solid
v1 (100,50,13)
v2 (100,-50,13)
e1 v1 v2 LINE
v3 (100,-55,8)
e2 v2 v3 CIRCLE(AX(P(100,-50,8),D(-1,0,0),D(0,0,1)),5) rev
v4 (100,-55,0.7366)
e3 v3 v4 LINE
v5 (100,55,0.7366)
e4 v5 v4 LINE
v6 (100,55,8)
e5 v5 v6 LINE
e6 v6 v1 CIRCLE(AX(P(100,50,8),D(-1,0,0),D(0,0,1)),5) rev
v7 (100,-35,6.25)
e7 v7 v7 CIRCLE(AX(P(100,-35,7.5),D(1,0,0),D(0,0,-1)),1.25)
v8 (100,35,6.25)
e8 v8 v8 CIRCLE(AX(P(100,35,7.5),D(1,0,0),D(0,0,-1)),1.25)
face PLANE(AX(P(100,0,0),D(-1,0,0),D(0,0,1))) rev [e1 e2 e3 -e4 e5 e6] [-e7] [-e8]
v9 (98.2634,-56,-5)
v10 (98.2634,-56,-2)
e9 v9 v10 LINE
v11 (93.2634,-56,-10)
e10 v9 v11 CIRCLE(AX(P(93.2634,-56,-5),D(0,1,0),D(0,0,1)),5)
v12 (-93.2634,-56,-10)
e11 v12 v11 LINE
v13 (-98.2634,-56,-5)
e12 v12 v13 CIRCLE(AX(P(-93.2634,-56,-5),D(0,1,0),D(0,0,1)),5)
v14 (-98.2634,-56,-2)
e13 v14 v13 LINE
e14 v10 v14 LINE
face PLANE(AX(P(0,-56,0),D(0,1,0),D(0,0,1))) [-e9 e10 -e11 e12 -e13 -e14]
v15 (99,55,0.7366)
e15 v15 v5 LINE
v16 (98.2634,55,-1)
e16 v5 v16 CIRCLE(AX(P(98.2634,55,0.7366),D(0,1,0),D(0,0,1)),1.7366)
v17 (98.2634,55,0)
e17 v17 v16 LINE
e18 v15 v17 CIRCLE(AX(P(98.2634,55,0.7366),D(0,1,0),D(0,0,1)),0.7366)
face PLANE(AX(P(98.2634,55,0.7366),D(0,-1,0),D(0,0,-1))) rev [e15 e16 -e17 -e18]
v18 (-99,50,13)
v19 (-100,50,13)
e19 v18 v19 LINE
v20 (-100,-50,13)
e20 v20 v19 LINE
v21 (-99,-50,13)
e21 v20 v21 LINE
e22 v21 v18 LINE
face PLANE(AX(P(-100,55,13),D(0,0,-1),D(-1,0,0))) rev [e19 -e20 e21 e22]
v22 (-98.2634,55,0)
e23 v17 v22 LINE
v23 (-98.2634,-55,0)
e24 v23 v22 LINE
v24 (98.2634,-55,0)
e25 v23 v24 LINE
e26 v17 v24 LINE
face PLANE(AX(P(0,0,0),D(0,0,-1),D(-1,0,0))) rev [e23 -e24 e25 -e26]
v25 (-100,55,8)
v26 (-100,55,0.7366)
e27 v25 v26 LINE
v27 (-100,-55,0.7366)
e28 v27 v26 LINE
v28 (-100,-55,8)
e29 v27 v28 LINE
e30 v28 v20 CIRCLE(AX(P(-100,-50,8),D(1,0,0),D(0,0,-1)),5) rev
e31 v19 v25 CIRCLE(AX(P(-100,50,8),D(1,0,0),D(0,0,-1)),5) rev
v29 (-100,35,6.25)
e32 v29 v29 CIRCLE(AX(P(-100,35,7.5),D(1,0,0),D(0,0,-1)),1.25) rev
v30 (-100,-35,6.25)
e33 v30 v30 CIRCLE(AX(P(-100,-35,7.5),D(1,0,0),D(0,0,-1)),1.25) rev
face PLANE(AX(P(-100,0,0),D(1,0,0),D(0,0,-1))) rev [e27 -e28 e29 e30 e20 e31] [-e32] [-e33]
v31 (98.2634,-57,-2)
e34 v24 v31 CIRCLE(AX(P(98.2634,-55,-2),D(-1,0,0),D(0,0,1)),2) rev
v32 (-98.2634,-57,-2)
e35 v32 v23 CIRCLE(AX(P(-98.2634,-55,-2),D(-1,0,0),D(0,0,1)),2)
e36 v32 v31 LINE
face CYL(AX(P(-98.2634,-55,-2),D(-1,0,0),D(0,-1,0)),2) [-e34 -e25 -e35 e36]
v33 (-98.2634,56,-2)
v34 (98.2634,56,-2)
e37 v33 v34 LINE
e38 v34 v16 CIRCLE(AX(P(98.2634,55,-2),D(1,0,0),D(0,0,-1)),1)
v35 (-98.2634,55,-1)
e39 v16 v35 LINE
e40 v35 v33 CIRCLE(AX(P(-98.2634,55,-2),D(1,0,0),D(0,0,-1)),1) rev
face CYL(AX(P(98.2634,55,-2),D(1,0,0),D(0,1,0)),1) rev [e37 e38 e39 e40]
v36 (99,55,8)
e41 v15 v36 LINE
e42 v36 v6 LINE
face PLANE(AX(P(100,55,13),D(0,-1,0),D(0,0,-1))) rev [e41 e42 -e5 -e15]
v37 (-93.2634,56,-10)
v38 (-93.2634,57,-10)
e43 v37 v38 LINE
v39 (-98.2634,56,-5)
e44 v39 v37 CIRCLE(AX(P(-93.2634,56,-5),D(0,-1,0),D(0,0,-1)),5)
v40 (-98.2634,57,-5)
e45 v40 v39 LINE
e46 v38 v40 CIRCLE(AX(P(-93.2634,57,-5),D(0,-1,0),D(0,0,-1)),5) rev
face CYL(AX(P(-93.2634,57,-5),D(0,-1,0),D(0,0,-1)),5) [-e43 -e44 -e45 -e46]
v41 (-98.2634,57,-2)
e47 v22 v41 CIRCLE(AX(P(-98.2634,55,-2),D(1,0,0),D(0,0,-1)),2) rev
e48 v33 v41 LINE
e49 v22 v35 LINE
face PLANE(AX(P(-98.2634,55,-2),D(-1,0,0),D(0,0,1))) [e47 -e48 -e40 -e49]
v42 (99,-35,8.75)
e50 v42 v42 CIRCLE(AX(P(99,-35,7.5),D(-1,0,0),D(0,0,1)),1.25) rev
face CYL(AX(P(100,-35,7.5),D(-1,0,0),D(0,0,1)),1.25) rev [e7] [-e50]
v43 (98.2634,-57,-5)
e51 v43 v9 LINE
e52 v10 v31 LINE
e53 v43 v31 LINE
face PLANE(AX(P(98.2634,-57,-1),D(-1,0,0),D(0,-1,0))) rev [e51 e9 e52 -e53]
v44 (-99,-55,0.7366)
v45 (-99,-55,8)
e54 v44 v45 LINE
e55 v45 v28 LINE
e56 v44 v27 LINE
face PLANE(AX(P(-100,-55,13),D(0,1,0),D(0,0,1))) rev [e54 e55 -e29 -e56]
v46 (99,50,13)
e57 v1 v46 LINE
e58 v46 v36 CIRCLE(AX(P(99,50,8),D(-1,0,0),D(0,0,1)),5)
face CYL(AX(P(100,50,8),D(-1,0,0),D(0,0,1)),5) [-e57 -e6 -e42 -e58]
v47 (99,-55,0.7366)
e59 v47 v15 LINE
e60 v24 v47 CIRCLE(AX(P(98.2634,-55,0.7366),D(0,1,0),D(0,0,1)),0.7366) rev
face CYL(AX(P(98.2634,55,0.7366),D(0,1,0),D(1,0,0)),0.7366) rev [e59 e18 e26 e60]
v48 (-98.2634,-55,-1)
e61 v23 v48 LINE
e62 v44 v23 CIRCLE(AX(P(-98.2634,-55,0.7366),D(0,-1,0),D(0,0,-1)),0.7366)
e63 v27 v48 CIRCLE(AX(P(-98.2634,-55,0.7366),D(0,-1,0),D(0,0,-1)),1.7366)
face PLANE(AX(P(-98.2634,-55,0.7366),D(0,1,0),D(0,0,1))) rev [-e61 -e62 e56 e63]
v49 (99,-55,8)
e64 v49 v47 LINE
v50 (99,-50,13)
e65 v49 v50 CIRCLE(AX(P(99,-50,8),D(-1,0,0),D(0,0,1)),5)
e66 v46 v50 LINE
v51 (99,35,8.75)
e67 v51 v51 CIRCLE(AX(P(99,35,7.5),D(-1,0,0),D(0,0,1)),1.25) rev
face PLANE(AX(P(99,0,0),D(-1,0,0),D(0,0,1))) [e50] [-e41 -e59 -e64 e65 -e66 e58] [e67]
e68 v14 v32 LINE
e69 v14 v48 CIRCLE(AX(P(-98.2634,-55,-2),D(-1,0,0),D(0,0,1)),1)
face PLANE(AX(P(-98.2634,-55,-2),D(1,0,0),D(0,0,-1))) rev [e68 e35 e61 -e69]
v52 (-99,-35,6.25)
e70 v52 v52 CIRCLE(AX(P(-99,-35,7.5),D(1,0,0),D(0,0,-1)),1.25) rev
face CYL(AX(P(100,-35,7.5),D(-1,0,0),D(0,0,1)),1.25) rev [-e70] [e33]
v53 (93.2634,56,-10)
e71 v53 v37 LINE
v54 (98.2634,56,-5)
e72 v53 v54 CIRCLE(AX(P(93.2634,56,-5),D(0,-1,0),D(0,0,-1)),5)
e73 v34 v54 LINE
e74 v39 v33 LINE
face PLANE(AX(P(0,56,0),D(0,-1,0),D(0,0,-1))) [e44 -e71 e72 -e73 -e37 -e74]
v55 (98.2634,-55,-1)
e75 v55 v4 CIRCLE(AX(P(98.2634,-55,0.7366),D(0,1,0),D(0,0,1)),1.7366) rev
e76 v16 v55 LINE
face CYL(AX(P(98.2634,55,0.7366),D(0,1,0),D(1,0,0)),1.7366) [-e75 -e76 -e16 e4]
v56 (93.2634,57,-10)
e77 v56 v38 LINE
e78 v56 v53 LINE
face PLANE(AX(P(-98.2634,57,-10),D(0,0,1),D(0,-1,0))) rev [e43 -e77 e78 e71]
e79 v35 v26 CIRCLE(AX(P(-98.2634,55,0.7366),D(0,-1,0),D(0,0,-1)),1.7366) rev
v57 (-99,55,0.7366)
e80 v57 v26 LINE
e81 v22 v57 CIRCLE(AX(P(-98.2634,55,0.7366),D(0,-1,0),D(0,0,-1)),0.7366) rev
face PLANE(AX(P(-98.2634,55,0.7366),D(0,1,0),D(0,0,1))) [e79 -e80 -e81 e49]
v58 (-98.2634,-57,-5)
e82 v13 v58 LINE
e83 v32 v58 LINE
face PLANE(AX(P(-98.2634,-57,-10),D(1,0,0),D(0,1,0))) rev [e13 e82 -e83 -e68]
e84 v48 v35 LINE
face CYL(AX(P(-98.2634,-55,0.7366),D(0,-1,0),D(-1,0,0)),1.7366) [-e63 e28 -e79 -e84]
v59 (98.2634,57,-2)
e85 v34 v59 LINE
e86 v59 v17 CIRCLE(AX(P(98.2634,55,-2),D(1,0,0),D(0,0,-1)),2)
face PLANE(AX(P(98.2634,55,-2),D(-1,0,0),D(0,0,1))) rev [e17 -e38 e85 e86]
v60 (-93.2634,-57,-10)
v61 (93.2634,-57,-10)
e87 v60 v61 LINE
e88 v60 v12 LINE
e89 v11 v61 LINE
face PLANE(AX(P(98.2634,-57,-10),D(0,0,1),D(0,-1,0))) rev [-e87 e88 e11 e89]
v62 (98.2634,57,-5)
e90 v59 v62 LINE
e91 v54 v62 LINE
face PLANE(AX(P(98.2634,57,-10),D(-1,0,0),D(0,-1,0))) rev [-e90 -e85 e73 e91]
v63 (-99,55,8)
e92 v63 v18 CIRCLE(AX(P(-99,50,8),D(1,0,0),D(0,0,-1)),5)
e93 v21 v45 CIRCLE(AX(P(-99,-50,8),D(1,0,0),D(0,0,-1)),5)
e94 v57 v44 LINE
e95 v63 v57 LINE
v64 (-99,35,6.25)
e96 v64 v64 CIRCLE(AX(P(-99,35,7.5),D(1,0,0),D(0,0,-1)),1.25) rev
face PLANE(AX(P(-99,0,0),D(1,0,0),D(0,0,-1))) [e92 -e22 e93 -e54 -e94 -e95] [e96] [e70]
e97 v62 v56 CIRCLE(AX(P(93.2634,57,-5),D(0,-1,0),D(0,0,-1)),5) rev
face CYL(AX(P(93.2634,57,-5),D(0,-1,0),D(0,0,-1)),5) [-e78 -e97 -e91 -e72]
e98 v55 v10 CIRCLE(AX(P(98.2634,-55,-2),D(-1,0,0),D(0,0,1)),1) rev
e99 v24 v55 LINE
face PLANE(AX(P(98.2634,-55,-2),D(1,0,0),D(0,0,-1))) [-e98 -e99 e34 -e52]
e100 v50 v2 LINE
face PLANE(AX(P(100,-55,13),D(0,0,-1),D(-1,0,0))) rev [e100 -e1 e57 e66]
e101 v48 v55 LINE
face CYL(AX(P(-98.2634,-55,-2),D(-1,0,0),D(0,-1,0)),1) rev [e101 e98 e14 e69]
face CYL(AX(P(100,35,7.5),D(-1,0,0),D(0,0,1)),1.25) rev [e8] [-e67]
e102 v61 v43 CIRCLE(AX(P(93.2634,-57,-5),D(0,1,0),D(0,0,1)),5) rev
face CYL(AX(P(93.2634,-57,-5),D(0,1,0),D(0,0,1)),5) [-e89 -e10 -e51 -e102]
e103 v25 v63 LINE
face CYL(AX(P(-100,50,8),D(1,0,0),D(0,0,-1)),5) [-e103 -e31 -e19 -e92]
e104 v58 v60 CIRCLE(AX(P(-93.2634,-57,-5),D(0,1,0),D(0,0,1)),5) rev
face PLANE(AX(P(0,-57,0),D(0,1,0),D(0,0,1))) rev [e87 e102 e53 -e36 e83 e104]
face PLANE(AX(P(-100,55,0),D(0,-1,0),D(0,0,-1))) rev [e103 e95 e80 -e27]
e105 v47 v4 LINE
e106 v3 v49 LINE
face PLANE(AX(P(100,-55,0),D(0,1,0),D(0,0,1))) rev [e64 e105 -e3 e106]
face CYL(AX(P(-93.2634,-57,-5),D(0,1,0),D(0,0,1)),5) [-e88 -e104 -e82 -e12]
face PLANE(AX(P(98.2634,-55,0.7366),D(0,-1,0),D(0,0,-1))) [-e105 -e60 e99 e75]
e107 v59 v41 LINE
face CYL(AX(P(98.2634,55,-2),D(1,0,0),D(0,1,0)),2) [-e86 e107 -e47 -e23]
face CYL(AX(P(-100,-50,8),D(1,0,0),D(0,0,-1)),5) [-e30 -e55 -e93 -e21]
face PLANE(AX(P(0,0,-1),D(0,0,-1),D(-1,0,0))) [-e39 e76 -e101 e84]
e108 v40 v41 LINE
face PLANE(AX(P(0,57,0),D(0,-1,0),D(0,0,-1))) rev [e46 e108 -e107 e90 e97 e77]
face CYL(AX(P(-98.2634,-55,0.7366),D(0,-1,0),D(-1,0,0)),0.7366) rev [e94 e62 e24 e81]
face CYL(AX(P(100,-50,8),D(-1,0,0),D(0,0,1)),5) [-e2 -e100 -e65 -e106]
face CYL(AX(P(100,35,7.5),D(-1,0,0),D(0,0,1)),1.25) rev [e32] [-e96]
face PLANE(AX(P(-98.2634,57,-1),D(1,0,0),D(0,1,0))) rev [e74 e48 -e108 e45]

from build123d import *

# Parameters (mm, degrees)
SKETCH1_W                    = 200
SKETCH1_H                    = 110
BASE_FLANGE1_DEPTH           = 1
EDGE_FLANGE1_STRIP_W         = 5.4732
EDGE_FLANGE1_STRIP_H         = 1
EDGE_FLANGE1_STRIP_CUT_DEPTH = 110
EDGE_FLANGE1_DEPTH           = 110
EDGE_FLANGE2_STRIP_W         = 5.4732
EDGE_FLANGE2_STRIP_H         = 1
EDGE_FLANGE2_STRIP_CUT_DEPTH = 110
EDGE_FLANGE2_DEPTH           = 110
CUT_EXTRUDE1_DEPTH           = 207.869524097
CUT_EXTRUDE1_DEPTH_BACK      = 10
SKETCH14_R                   = 1.25
EDGE_FLANGE3_DEPTH           = 196.5268
EDGE_FLANGE3_BEND_DEPTH      = 196.5268
FILLET1_R                    = 5


# Sheet-metal steps are written as plain solids
with BuildPart() as part:
    # Sketch1 → Base-Flange1 (new body)
    with BuildSketch(Plane.XY):
        Rectangle(SKETCH1_W, SKETCH1_H)
    extrude(amount=-BASE_FLANGE1_DEPTH)

    # Edge-Flange1 strip (across the edge) → Edge-Flange1 strip cut (cut)
    with BuildSketch(Plane(origin=(-100, 55, 0), x_dir=(1, 0, 0), z_dir=(0, -1, 0))):
        with Locations((-1, -0.5)):
            Rectangle(EDGE_FLANGE1_STRIP_W, EDGE_FLANGE1_STRIP_H)
    extrude(amount=EDGE_FLANGE1_STRIP_CUT_DEPTH, mode=Mode.SUBTRACT)

    # Edge-Flange1 section (across the edge) → Edge-Flange1 (add)
    with BuildSketch(Plane(origin=(-100, 55, 0), x_dir=(1, 0, 0), z_dir=(0, -1, 0))):
        with BuildLine():
            Line((0, 0.7366), (0, 13))
            Line((0, 13), (1, 13))
            Line((1, 13), (1, 0.7366))
            ThreePointArc((1, 0.7366), (1.215745145, 0.215745145), (1.7366, 0))
            Line((1.7366, 0), (1.7366, -1))
            ThreePointArc((1.7366, -1), (0.508638364, -0.491361636), (0, 0.7366))
        make_face()
    extrude(amount=EDGE_FLANGE1_DEPTH)

    # Edge-Flange2 strip (across the edge) → Edge-Flange2 strip cut (cut)
    with BuildSketch(Plane(origin=(100, -55, 0), x_dir=(-1, 0, 0), z_dir=(0, 1, 0))):
        with Locations((-1, -0.5)):
            Rectangle(EDGE_FLANGE2_STRIP_W, EDGE_FLANGE2_STRIP_H)
    extrude(amount=EDGE_FLANGE2_STRIP_CUT_DEPTH, mode=Mode.SUBTRACT)

    # Edge-Flange2 section (across the edge) → Edge-Flange2 (add)
    with BuildSketch(Plane(origin=(100, -55, 0), x_dir=(-1, 0, 0), z_dir=(0, 1, 0))):
        with BuildLine():
            Line((0, 0.7366), (0, 13))
            Line((0, 13), (1, 13))
            Line((1, 13), (1, 0.7366))
            ThreePointArc((1, 0.7366), (1.215745145, 0.215745145), (1.7366, 0))
            Line((1.7366, 0), (1.7366, -1))
            ThreePointArc((1.7366, -1), (0.508638364, -0.491361636), (0, 0.7366))
        make_face()
    extrude(amount=EDGE_FLANGE2_DEPTH)

    # Sketch14 → Cut-Extrude1 (cut, two sides: drawn at the far end of the back side and taken through both)
    with BuildSketch(Plane(origin=(-99, 0, 0), x_dir=(0, 0, -1), z_dir=(1, 0, 0)).offset(-CUT_EXTRUDE1_DEPTH_BACK)):
        with Locations(Location((-7.5, -35, 0), (0, 0, 180))):
            Circle(SKETCH14_R)
        with Locations(Location((-7.5, 35, 0), (0, 0, 180))):
            Circle(SKETCH14_R)
    extrude(amount=CUT_EXTRUDE1_DEPTH + CUT_EXTRUDE1_DEPTH_BACK, mode=Mode.SUBTRACT)

    # Edge-Flange3 section (across the edge) → Edge-Flange3 (add)
    with BuildSketch(Plane(origin=(98.2634, -56, -1), x_dir=(0, 1, 0), z_dir=(-1, 0, 0))):
        with BuildLine():
            Line((-1, 1), (-1, 9))
            Line((-1, 9), (0, 9))
            Line((0, 9), (0, 1))
            ThreePointArc((0, 1), (0.292893219, 0.292893219), (1, 0))
            Line((1, 0), (1, -1))
            ThreePointArc((1, -1), (-0.414213562, -0.414213562), (-1, 1))
        make_face()
    extrude(amount=EDGE_FLANGE3_DEPTH)

    # Edge-Flange3 section 2 (across the edge) → Edge-Flange3 bend (add)
    with BuildSketch(Plane(origin=(-98.2634, 56, -1), x_dir=(0, -1, 0), z_dir=(1, 0, 0))):
        with BuildLine():
            Line((-1, 1), (-1, 9))
            Line((-1, 9), (0, 9))
            Line((0, 9), (0, 1))
            ThreePointArc((0, 1), (0.292893219, 0.292893219), (1, 0))
            Line((1, 0), (1, -1))
            ThreePointArc((1, -1), (-0.414213562, -0.414213562), (-1, 1))
        make_face()
    extrude(amount=EDGE_FLANGE3_BEND_DEPTH)

    # Fillet1
    fillet1_edges = [part.edges().sort_by_distance(p)[0] for p in [
        (98.2634, -56.5, -10),
        (-98.2634, -56.5, -10),
        (-98.2634, 56.5, -10),
        (98.2634, 56.5, -10),
        (-99.5, 55, 13),
        (-99.5, -55, 13),
        (99.5, -55, 13),
        (99.5, 55, 13),
    ]]
    fillet(fillet1_edges, radius=FILLET1_R)


solid = part.part
